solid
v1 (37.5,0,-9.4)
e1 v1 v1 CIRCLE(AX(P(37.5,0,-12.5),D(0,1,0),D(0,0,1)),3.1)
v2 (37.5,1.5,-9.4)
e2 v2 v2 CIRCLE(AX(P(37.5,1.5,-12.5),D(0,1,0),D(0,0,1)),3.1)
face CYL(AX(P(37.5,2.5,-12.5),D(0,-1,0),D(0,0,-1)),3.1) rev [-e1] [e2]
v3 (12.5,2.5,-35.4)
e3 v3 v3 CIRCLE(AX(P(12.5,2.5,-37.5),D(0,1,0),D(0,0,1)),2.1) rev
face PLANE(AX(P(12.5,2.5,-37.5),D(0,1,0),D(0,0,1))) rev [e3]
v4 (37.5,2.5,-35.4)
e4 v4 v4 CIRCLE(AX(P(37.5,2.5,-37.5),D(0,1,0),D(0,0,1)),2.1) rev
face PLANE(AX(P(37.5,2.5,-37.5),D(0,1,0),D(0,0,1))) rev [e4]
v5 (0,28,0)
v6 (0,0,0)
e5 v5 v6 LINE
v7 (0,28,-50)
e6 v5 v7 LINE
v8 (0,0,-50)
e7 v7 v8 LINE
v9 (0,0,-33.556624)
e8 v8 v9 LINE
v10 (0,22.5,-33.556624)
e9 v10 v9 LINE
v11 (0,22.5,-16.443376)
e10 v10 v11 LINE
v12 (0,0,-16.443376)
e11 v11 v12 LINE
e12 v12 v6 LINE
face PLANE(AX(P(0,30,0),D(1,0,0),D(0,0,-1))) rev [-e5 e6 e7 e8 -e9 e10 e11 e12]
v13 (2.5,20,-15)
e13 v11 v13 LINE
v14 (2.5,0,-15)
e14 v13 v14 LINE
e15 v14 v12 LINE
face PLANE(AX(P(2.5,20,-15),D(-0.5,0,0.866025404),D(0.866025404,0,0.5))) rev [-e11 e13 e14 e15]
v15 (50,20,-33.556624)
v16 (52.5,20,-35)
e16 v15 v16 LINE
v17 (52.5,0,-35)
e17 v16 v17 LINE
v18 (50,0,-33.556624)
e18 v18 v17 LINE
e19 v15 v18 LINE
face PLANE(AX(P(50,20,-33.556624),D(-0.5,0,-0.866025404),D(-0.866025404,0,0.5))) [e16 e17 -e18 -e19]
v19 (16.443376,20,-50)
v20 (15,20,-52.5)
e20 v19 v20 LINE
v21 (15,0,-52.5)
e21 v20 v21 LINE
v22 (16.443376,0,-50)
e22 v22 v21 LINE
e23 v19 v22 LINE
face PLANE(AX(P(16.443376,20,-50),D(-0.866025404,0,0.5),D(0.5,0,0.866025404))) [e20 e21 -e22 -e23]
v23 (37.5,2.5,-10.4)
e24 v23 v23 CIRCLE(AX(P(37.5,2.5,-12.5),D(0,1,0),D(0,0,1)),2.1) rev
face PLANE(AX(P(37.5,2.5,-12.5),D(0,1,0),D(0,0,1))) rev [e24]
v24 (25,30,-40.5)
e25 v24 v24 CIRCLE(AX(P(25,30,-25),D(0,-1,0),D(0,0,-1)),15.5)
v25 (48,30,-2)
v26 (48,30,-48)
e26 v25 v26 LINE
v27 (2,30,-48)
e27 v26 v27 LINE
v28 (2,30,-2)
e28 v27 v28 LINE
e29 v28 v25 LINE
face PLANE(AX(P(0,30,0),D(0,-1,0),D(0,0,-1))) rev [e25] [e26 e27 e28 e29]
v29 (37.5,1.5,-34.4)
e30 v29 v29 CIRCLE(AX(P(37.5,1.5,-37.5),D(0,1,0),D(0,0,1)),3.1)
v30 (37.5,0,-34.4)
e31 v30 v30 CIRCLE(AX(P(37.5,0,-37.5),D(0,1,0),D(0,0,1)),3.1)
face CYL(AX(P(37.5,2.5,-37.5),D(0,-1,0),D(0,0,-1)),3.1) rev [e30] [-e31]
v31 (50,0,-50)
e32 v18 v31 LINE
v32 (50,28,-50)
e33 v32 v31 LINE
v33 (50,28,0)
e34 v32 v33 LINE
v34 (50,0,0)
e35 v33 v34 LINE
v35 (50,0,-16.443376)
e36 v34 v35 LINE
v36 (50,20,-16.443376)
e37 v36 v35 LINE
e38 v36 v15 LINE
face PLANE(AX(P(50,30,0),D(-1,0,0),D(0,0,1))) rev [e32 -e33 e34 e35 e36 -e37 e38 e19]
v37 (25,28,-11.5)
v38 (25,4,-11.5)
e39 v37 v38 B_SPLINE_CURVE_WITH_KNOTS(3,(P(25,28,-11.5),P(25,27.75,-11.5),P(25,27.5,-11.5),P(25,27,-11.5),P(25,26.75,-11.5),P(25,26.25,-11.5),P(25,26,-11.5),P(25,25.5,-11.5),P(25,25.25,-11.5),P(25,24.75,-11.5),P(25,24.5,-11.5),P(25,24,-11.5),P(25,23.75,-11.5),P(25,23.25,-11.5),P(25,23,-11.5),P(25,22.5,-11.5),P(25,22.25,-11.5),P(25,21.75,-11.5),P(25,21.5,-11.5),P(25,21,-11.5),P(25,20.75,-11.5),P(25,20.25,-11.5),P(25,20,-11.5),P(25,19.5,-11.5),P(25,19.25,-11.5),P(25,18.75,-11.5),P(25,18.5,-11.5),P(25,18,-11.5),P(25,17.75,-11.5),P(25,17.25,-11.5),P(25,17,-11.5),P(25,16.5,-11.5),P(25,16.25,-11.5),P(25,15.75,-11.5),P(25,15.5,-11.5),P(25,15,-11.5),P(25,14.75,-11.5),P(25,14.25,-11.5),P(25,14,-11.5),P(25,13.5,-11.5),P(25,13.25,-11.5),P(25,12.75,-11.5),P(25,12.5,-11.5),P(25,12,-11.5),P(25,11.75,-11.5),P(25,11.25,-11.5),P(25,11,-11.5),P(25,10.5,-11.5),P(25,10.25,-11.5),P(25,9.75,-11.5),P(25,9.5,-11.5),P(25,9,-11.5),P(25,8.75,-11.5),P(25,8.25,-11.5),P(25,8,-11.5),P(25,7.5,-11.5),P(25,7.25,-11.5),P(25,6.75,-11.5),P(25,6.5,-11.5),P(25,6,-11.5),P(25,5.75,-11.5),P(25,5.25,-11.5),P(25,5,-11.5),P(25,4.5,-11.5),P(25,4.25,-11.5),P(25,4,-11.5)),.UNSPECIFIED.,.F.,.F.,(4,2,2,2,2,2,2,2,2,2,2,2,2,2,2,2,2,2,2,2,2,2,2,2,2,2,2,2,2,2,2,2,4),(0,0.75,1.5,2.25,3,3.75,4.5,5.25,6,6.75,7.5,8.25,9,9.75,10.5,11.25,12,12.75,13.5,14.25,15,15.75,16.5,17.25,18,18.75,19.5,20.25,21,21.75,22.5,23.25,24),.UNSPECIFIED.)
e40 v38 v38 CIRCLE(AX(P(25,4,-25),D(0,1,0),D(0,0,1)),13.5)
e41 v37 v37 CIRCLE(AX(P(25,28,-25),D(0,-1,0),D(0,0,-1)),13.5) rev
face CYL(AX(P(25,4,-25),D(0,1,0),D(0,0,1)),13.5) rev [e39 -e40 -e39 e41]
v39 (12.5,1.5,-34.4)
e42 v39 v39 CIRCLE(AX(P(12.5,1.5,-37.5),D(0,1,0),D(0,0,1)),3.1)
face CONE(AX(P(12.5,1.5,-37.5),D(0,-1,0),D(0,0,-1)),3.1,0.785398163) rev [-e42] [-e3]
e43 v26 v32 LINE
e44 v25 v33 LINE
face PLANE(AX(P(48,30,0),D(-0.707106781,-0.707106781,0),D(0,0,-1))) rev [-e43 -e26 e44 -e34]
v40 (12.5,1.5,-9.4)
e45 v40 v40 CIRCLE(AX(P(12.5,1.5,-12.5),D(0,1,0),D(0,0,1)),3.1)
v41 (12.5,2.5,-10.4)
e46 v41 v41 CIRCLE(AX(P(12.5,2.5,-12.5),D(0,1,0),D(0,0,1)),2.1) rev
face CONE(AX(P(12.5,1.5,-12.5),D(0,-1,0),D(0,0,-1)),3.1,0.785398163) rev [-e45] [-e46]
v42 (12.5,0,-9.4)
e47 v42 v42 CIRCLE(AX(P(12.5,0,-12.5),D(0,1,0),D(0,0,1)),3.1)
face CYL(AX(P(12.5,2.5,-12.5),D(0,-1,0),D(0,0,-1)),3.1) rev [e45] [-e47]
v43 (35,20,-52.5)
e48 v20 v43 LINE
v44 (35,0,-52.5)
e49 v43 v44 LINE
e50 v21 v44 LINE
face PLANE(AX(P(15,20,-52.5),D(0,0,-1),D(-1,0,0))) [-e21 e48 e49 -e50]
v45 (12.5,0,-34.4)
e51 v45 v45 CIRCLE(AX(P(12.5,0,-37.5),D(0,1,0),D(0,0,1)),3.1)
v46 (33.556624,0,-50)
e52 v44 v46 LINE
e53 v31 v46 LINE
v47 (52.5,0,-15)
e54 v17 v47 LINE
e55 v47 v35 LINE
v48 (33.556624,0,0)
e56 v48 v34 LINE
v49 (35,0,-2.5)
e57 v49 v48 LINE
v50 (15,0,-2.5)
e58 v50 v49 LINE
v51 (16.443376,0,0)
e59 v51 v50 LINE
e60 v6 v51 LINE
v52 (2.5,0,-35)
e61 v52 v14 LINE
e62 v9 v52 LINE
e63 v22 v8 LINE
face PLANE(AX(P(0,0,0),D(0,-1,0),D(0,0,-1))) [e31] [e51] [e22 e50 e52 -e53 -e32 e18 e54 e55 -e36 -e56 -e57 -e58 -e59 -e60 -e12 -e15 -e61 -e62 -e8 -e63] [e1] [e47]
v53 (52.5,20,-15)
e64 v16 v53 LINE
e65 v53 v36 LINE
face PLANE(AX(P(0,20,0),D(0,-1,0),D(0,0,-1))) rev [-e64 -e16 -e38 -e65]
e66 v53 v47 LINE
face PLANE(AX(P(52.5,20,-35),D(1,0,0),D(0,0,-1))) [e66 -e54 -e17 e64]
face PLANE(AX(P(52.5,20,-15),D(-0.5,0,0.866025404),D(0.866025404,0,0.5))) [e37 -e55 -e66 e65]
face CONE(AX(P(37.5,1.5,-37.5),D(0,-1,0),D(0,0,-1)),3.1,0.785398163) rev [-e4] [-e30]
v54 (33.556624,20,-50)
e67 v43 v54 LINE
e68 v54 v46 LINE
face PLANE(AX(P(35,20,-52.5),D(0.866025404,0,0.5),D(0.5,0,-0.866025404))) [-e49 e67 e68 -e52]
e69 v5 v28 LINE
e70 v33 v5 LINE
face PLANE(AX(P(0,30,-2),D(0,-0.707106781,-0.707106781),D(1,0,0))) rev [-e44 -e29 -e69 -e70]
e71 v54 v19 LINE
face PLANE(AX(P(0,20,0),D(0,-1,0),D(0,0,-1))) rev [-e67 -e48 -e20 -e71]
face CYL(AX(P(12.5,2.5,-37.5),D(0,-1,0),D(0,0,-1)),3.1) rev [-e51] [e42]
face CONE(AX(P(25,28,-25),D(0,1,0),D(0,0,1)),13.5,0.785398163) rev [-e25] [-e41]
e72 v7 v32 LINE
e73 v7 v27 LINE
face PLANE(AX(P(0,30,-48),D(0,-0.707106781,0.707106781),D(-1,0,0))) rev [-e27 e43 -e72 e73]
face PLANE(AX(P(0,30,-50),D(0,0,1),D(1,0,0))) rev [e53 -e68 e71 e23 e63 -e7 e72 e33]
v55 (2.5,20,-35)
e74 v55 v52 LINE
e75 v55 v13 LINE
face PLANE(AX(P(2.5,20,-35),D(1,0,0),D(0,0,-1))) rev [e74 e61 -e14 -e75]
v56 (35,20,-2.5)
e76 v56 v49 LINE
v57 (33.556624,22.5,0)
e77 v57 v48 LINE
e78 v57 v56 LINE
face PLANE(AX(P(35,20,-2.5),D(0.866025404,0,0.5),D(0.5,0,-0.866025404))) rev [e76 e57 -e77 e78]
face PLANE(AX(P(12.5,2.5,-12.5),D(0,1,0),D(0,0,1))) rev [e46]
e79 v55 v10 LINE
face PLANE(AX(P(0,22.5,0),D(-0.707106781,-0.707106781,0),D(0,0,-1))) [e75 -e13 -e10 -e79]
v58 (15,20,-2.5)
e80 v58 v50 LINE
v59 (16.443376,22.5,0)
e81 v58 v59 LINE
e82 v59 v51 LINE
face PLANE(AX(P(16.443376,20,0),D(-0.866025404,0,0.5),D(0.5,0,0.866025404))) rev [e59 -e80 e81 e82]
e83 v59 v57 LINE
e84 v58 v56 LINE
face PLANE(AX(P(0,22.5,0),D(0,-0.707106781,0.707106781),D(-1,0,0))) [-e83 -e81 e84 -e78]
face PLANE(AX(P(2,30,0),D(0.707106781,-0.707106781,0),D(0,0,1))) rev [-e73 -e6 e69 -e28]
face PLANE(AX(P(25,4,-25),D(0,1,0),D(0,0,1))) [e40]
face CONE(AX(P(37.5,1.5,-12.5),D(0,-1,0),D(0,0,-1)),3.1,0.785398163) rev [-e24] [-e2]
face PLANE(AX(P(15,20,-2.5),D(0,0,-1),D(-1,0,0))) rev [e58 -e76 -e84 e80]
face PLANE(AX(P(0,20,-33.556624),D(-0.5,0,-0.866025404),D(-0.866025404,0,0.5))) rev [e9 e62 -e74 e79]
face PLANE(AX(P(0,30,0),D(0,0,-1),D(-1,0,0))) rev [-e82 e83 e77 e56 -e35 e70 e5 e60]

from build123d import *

# Parameters (mm, degrees)
SKETCH1_W           = 50
SKETCH1_H           = 50
BOSS_EXTRUDE1_DEPTH = 30
SKETCH2_R           = 13.5
CUT_EXTRUDE1_DEPTH  = 26
BOSS_EXTRUDE2_DEPTH = 20
BOSS_EXTRUDE3_DEPTH = 20
CUT_EXTRUDE2_DEPTH  = 20
CUT_EXTRUDE3_DEPTH  = 20
CHAMFER1_SIZE       = 2
SKETCH4_R           = 3.1
CUT_EXTRUDE4_DEPTH  = 2.5
CHAMFER2_SIZE       = 1
CHAMFER3_SIZE       = 2.5


with BuildPart() as part:
    # Sketch1 → Boss-Extrude1 (new body)
    with BuildSketch(Plane(origin=(0, 0, 0), x_dir=(1, 0, 0), z_dir=(0, 1, 0))):
        with Locations((25, 25)):
            Rectangle(SKETCH1_W, SKETCH1_H)
    extrude(amount=BOSS_EXTRUDE1_DEPTH)

    # Sketch2 → Cut-Extrude1 (cut)
    with BuildSketch(Plane(origin=(0, 30, 0), x_dir=(1, 0, 0), z_dir=(0, 1, 0))):
        with Locations(Location((25, 25, 0), (0, 0, 270))):
            Circle(SKETCH2_R)
    extrude(amount=-CUT_EXTRUDE1_DEPTH, mode=Mode.SUBTRACT)

    # Sketch3 → Boss-Extrude2 (add)
    with BuildSketch(Plane(origin=(0, 0, 0), x_dir=(1, 0, 0), z_dir=(0, 1, 0))):
        Polygon((50, 33.556624327), (52.5, 35), (52.5, 15), (50, 16.443375673), align=None)
    extrude(amount=BOSS_EXTRUDE2_DEPTH)

    # Sketch3<3> → Boss-Extrude3 (add)
    with BuildSketch(Plane(origin=(0, 0, 0), x_dir=(1, 0, 0), z_dir=(0, 1, 0))):
        Polygon((16.443375673, 50), (15, 52.5), (35, 52.5), (33.556624327, 50), align=None)
    extrude(amount=BOSS_EXTRUDE3_DEPTH)

    # Sketch3<4> → Cut-Extrude2 (cut)
    with BuildSketch(Plane(origin=(0, 0, 0), x_dir=(1, 0, 0), z_dir=(0, 1, 0))):
        Polygon((0, 33.556624327), (2.5, 35), (2.5, 15), (0, 16.443375673), align=None)
    extrude(amount=CUT_EXTRUDE2_DEPTH, mode=Mode.SUBTRACT)

    # Sketch3<5> → Cut-Extrude3 (cut)
    with BuildSketch(Plane(origin=(0, 0, 0), x_dir=(1, 0, 0), z_dir=(0, 1, 0))):
        Polygon((16.443375673, 0), (15, 2.5), (35, 2.5), (33.556624327, 0), align=None)
    extrude(amount=CUT_EXTRUDE3_DEPTH, mode=Mode.SUBTRACT)

    # Chamfer1
    chamfer1_edges = [part.edges().sort_by_distance(p)[0] for p in [
        (50, 30, -25),
        (25, 30, -38.5),
        (25, 30, -50),
        (0, 30, -25),
        (25, 30, 0),
    ]]
    chamfer(chamfer1_edges, length=CHAMFER1_SIZE)

    # Sketch4 → Cut-Extrude4 (cut)
    with BuildSketch(Plane(origin=(0, 0, 0), x_dir=(1, 0, 0), z_dir=(0, 1, 0))):
        with Locations(Location((12.5, 37.5, 0), (0, 0, 270))):
            Circle(SKETCH4_R)
        with Locations(Location((37.5, 37.5, 0), (0, 0, 270))):
            Circle(SKETCH4_R)
        with Locations(Location((37.5, 12.5, 0), (0, 0, 270))):
            Circle(SKETCH4_R)
        with Locations(Location((12.5, 12.5, 0), (0, 0, 270))):
            Circle(SKETCH4_R)
    extrude(amount=CUT_EXTRUDE4_DEPTH, mode=Mode.SUBTRACT)

    # Chamfer2
    chamfer2_edges = [part.edges().sort_by_distance(p)[0] for p in [
        (12.5, 2.5, -40.6),
        (12.5, 2.5, -15.6),
        (37.5, 2.5, -15.6),
        (37.5, 2.5, -40.6),
    ]]
    chamfer(chamfer2_edges, length=CHAMFER2_SIZE)

    # Chamfer3
    chamfer3_edges = [part.edges().sort_by_distance(p)[0] for p in [
        (0, 20, -25),
        (25, 20, 0),
    ]]
    chamfer(chamfer3_edges, length=CHAMFER3_SIZE - 0.0001)  # a hair under: the kernel refuses the full size


solid = part.part
